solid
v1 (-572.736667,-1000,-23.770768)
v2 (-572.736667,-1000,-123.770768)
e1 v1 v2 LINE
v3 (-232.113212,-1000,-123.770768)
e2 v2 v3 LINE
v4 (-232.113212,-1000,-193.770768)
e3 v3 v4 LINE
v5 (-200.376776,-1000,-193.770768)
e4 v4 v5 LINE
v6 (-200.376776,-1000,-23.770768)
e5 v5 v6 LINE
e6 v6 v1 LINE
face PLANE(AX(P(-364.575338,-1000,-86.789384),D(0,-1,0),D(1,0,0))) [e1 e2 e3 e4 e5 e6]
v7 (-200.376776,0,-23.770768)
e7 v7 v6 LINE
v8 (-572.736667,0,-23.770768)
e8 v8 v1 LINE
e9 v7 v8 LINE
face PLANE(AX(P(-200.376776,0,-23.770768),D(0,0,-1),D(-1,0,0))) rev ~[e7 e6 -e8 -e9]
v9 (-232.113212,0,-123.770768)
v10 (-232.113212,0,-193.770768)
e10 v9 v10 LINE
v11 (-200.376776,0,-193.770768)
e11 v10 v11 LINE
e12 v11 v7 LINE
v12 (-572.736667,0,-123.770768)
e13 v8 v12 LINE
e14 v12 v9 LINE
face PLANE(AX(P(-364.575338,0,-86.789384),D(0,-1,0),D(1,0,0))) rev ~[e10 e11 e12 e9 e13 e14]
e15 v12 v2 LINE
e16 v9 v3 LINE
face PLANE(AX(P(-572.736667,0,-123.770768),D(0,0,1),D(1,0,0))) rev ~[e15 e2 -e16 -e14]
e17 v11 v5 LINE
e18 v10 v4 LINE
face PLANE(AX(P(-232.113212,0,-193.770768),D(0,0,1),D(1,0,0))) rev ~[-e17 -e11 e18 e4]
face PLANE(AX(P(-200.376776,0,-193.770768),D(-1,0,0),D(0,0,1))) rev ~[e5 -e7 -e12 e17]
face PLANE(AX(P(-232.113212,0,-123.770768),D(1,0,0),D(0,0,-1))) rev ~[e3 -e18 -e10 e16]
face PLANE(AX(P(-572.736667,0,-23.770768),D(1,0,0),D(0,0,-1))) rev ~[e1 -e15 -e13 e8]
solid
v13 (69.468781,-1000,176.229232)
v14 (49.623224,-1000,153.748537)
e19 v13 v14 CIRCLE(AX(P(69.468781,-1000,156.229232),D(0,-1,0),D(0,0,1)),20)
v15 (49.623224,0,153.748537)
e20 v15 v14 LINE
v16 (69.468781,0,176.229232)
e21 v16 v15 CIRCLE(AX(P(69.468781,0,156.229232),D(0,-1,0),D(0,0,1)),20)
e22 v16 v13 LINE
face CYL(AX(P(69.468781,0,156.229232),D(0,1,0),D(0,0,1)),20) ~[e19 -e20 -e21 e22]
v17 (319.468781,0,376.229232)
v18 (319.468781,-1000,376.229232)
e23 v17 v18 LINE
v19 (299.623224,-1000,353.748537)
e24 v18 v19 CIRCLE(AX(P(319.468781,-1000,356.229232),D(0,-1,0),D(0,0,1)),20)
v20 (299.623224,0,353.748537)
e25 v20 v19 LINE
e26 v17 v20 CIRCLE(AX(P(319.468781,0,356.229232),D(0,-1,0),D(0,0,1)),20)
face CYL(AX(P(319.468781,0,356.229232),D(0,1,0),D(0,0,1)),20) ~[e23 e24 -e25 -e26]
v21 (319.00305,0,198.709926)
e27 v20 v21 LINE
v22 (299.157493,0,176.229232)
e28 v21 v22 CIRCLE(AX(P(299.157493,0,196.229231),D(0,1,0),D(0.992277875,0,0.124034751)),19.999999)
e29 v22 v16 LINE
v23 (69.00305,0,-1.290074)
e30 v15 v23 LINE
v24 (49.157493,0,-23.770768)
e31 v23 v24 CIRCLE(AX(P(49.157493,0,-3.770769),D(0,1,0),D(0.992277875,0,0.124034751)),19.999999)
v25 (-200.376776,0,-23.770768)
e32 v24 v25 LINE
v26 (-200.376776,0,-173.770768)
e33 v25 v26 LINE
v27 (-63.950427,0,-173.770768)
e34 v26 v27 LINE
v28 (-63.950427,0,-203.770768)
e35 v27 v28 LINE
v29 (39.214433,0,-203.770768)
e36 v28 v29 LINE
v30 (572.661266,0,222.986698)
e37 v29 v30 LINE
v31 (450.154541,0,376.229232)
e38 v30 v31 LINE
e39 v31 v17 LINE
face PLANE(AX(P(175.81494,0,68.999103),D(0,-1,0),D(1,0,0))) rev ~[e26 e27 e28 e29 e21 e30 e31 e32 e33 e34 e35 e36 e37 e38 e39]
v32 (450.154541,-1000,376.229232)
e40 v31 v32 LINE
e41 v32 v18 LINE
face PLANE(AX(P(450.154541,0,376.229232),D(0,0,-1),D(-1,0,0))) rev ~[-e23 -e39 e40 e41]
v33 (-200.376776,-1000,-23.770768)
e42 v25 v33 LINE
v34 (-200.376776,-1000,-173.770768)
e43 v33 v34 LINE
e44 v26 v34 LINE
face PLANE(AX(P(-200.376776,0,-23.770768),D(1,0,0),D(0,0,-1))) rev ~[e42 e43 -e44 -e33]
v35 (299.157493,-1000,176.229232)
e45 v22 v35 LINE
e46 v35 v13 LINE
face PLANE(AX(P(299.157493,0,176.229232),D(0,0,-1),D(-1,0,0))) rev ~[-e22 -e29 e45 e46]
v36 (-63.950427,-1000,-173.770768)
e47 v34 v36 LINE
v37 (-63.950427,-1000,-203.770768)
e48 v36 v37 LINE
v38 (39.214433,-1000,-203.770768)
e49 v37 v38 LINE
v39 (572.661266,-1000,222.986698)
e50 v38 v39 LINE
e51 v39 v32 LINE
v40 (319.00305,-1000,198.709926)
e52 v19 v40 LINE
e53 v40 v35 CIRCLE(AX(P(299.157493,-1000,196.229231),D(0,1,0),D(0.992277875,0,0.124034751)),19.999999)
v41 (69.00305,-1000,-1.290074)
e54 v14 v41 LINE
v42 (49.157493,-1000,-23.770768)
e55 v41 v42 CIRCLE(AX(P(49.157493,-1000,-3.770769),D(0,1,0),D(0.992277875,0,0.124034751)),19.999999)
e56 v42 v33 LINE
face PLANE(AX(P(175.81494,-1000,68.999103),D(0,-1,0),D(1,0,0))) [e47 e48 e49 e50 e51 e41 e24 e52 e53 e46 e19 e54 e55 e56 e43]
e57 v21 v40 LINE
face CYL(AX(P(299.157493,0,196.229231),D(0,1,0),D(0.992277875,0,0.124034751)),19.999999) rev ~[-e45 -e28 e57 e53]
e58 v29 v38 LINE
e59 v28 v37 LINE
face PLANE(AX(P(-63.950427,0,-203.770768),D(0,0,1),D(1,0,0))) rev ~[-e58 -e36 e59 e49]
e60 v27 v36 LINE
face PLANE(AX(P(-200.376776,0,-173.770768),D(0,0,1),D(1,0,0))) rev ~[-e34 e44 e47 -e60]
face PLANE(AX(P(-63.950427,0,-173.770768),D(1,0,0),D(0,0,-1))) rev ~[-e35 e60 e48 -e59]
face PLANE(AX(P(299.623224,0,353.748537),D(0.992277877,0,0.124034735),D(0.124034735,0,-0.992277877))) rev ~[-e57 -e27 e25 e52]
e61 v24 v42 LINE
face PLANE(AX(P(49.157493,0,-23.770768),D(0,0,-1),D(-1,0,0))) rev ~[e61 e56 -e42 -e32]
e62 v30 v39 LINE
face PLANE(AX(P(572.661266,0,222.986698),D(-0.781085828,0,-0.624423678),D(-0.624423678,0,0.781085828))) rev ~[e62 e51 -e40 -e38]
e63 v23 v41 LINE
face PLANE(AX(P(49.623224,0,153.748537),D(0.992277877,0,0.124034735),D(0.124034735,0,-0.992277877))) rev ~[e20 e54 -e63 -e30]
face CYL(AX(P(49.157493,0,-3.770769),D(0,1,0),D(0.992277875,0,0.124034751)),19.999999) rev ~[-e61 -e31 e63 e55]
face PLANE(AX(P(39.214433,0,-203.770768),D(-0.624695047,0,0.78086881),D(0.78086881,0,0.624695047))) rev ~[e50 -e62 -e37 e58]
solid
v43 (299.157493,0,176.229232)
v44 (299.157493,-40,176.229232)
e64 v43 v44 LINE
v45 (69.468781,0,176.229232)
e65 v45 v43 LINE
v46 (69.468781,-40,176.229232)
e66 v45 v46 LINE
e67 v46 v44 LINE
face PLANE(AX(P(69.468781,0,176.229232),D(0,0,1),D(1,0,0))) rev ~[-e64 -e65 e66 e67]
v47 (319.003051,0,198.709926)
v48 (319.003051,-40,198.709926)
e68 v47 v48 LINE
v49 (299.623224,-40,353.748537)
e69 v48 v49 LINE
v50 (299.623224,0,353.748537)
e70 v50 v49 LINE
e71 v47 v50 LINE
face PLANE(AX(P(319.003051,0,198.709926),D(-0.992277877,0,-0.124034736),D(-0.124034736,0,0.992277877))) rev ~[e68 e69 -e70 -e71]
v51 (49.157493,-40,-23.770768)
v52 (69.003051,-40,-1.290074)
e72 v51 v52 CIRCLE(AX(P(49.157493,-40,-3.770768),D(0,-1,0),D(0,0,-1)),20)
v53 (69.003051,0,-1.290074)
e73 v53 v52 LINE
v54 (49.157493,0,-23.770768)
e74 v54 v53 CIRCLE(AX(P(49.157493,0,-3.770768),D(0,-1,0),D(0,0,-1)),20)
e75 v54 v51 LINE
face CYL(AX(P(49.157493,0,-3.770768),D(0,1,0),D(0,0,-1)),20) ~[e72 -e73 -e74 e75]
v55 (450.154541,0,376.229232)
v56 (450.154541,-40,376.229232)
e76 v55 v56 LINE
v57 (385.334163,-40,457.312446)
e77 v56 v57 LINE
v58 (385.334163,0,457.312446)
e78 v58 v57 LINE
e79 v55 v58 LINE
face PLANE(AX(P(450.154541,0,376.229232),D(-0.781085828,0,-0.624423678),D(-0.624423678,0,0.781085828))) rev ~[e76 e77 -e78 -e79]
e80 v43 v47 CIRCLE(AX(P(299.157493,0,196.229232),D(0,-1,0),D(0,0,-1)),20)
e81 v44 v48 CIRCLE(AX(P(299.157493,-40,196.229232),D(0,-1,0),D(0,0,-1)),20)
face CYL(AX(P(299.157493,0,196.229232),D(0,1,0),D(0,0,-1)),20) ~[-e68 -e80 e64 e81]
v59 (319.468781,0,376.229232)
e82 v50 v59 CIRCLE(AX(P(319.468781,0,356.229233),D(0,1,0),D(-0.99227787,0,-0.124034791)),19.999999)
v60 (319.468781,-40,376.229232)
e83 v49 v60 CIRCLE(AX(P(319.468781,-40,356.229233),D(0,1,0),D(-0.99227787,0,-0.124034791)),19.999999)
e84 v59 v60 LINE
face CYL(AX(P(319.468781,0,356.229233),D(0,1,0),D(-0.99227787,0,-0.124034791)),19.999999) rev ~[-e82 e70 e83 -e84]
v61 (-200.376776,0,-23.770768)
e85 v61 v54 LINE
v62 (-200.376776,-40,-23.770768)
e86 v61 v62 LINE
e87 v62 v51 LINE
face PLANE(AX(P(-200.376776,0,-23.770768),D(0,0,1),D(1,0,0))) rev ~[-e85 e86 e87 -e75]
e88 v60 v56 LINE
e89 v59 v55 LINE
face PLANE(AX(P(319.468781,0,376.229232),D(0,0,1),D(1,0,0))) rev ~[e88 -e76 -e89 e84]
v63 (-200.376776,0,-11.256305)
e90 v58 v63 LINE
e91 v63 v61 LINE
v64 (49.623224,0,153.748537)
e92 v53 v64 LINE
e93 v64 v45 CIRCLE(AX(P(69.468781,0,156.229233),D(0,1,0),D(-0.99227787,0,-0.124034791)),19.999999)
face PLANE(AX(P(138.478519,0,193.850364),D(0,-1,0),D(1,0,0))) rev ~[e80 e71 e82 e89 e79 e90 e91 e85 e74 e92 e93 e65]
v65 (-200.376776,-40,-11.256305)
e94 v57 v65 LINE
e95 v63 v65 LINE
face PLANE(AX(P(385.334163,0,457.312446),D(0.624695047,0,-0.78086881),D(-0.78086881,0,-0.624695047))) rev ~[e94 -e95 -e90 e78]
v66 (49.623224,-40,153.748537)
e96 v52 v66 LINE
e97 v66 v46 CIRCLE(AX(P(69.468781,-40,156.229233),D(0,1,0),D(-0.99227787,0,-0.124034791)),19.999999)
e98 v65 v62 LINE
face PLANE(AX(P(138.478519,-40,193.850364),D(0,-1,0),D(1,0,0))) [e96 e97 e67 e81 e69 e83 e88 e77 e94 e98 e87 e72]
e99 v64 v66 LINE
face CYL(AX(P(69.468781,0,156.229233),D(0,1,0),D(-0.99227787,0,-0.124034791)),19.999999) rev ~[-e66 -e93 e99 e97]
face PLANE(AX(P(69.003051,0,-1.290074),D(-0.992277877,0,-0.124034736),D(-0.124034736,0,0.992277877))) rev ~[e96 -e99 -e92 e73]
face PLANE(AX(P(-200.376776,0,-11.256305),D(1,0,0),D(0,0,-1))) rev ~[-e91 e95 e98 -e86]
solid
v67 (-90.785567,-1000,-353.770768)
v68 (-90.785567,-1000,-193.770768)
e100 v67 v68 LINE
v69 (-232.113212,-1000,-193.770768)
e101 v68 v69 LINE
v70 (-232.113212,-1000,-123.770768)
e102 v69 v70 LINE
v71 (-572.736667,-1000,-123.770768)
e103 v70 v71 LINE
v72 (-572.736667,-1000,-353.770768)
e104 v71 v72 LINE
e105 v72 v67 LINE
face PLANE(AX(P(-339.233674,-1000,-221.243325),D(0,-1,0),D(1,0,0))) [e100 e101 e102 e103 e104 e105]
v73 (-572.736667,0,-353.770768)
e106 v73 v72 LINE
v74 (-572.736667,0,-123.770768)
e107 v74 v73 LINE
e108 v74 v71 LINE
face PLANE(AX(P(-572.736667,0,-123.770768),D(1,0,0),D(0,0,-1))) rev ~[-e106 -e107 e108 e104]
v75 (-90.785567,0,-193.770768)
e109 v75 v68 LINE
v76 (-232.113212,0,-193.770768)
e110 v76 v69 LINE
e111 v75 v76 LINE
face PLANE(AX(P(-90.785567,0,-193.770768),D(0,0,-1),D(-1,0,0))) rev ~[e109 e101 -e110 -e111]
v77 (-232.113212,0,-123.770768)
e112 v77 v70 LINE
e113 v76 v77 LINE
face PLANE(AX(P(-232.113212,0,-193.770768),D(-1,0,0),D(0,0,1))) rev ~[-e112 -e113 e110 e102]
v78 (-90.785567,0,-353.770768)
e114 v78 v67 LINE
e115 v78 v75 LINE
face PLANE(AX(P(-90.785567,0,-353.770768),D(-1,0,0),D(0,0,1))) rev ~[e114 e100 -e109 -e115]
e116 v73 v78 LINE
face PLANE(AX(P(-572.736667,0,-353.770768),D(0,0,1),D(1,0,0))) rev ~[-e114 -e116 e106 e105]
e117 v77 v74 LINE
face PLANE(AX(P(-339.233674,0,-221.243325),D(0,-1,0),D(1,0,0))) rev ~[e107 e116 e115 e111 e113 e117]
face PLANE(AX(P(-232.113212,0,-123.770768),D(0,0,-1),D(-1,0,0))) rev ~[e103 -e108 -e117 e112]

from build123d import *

# Parameters (mm, degrees)
F0_W     = 481.9511
F0_H     = 50
F1_DEPTH = 1000
F2_DEPTH = 1000
F3_DEPTH = 1000
F4_DEPTH = 40


# Not quite as in the source:
# - ends of sketch curves that miss each other by under 0.0002 mm in the source are joined


with BuildPart() as f1:
    # F0 (on Front) → F1 (new body)
    with BuildSketch(Plane.XZ):
        Polygon((-90.785567, -193.770768), (-200.376776, -193.770768), (-232.113212, -193.770768), (-232.113212, -123.770768), (-572.736667, -123.770768), (-572.736667, -303.770768), (-90.785567, -303.770768), align=None)
        with Locations((-331.761117, -328.770768)):
            Rectangle(F0_W, F0_H)
    extrude(amount=F1_DEPTH)


with BuildPart() as f2:
    # F0 (on Front) → F2 (new body)
    with BuildSketch(Plane.XZ):
        Polygon((-200.376776, -173.770768), (-200.376776, -23.770768), (-572.736667, -23.770768), (-572.736667, -123.770768), (-232.113212, -123.770768), (-232.113212, -193.770768), (-200.376776, -193.770768), align=None)
    extrude(amount=F2_DEPTH)


with BuildPart() as f3:
    # F0 (on Front) → F3 (new body)
    with BuildSketch(Plane.XZ):
        with BuildLine():
            Line((49.157493, -23.770768), (-200.376776, -23.770768))
            Line((-200.376776, -23.770768), (-200.376776, -173.770768))
            Line((-200.376776, -173.770768), (-90.785567, -173.770768))
            Line((-90.785567, -173.770768), (-63.950427, -173.770768))
            Line((-63.950427, -173.770768), (-63.950427, -203.770768))
            Line((-63.950427, -203.770768), (39.214433, -203.770768))
            Line((39.214433, -203.770768), (226.7144330686, -53.7707680857))
            Line((226.7144330686, -53.7707680857), (572.661266, 222.986698))
            Line((572.661266, 222.986698), (450.1545409622, 376.2292319698))
            Line((450.1545409622, 376.2292319698), (319.468781, 376.229232))
            ThreePointArc((319.468781, 376.229232), (304.4752173606, 369.4652831252), (299.6232235119, 353.748536939))
            Line((299.6232235119, 353.748536939), (319.00305, 198.709926))
            ThreePointArc((319.00305, 198.709926), (314.1510563111, 182.9931805028), (299.157493, 176.229232))
            Line((299.157493, 176.229232), (69.468781, 176.229232))
            ThreePointArc((69.468781, 176.229232), (54.4752173606, 169.4652831252), (49.6232235119, 153.748536939))
            Line((49.6232235119, 153.748536939), (69.00305, -1.290074))
            ThreePointArc((69.00305, -1.290074), (64.1510563111, -17.0068194972), (49.157493, -23.770768))
        make_face()
    extrude(amount=F3_DEPTH)


with BuildPart() as f4:
    # F0 (on Front) → F4 (new body)
    with BuildSketch(Plane.XZ):
        with BuildLine():
            Line((-200.376776, -11.256305), (-200.376776, -23.770768))
            Line((-200.376776, -23.770768), (49.157493, -23.770768))
            ThreePointArc((49.157493, -23.770768), (64.1510563111, -17.0068194972), (69.0030506112, -1.2900739236))
            Line((69.0030506112, -1.2900739236), (49.623224, 153.748537))
            ThreePointArc((49.623224, 153.748537), (54.4752173606, 169.4652831252), (69.468781, 176.229232))
            Line((69.468781, 176.229232), (299.157493, 176.229232))
            ThreePointArc((299.157493, 176.229232), (314.1510563111, 182.9931805028), (319.0030506112, 198.7099260764))
            Line((319.0030506112, 198.7099260764), (299.623224, 353.748537))
            ThreePointArc((299.623224, 353.748537), (304.4752173606, 369.4652831252), (319.468781, 376.229232))
            Line((319.468781, 376.229232), (450.154541, 376.229232))
            Line((450.154541, 376.229232), (385.3341629587, 457.312445967))
            Line((385.3341629587, 457.312445967), (-200.376776, -11.256305))
        make_face()
    extrude(amount=F4_DEPTH)


solid = Compound([f1.part, f2.part, f3.part, f4.part])
